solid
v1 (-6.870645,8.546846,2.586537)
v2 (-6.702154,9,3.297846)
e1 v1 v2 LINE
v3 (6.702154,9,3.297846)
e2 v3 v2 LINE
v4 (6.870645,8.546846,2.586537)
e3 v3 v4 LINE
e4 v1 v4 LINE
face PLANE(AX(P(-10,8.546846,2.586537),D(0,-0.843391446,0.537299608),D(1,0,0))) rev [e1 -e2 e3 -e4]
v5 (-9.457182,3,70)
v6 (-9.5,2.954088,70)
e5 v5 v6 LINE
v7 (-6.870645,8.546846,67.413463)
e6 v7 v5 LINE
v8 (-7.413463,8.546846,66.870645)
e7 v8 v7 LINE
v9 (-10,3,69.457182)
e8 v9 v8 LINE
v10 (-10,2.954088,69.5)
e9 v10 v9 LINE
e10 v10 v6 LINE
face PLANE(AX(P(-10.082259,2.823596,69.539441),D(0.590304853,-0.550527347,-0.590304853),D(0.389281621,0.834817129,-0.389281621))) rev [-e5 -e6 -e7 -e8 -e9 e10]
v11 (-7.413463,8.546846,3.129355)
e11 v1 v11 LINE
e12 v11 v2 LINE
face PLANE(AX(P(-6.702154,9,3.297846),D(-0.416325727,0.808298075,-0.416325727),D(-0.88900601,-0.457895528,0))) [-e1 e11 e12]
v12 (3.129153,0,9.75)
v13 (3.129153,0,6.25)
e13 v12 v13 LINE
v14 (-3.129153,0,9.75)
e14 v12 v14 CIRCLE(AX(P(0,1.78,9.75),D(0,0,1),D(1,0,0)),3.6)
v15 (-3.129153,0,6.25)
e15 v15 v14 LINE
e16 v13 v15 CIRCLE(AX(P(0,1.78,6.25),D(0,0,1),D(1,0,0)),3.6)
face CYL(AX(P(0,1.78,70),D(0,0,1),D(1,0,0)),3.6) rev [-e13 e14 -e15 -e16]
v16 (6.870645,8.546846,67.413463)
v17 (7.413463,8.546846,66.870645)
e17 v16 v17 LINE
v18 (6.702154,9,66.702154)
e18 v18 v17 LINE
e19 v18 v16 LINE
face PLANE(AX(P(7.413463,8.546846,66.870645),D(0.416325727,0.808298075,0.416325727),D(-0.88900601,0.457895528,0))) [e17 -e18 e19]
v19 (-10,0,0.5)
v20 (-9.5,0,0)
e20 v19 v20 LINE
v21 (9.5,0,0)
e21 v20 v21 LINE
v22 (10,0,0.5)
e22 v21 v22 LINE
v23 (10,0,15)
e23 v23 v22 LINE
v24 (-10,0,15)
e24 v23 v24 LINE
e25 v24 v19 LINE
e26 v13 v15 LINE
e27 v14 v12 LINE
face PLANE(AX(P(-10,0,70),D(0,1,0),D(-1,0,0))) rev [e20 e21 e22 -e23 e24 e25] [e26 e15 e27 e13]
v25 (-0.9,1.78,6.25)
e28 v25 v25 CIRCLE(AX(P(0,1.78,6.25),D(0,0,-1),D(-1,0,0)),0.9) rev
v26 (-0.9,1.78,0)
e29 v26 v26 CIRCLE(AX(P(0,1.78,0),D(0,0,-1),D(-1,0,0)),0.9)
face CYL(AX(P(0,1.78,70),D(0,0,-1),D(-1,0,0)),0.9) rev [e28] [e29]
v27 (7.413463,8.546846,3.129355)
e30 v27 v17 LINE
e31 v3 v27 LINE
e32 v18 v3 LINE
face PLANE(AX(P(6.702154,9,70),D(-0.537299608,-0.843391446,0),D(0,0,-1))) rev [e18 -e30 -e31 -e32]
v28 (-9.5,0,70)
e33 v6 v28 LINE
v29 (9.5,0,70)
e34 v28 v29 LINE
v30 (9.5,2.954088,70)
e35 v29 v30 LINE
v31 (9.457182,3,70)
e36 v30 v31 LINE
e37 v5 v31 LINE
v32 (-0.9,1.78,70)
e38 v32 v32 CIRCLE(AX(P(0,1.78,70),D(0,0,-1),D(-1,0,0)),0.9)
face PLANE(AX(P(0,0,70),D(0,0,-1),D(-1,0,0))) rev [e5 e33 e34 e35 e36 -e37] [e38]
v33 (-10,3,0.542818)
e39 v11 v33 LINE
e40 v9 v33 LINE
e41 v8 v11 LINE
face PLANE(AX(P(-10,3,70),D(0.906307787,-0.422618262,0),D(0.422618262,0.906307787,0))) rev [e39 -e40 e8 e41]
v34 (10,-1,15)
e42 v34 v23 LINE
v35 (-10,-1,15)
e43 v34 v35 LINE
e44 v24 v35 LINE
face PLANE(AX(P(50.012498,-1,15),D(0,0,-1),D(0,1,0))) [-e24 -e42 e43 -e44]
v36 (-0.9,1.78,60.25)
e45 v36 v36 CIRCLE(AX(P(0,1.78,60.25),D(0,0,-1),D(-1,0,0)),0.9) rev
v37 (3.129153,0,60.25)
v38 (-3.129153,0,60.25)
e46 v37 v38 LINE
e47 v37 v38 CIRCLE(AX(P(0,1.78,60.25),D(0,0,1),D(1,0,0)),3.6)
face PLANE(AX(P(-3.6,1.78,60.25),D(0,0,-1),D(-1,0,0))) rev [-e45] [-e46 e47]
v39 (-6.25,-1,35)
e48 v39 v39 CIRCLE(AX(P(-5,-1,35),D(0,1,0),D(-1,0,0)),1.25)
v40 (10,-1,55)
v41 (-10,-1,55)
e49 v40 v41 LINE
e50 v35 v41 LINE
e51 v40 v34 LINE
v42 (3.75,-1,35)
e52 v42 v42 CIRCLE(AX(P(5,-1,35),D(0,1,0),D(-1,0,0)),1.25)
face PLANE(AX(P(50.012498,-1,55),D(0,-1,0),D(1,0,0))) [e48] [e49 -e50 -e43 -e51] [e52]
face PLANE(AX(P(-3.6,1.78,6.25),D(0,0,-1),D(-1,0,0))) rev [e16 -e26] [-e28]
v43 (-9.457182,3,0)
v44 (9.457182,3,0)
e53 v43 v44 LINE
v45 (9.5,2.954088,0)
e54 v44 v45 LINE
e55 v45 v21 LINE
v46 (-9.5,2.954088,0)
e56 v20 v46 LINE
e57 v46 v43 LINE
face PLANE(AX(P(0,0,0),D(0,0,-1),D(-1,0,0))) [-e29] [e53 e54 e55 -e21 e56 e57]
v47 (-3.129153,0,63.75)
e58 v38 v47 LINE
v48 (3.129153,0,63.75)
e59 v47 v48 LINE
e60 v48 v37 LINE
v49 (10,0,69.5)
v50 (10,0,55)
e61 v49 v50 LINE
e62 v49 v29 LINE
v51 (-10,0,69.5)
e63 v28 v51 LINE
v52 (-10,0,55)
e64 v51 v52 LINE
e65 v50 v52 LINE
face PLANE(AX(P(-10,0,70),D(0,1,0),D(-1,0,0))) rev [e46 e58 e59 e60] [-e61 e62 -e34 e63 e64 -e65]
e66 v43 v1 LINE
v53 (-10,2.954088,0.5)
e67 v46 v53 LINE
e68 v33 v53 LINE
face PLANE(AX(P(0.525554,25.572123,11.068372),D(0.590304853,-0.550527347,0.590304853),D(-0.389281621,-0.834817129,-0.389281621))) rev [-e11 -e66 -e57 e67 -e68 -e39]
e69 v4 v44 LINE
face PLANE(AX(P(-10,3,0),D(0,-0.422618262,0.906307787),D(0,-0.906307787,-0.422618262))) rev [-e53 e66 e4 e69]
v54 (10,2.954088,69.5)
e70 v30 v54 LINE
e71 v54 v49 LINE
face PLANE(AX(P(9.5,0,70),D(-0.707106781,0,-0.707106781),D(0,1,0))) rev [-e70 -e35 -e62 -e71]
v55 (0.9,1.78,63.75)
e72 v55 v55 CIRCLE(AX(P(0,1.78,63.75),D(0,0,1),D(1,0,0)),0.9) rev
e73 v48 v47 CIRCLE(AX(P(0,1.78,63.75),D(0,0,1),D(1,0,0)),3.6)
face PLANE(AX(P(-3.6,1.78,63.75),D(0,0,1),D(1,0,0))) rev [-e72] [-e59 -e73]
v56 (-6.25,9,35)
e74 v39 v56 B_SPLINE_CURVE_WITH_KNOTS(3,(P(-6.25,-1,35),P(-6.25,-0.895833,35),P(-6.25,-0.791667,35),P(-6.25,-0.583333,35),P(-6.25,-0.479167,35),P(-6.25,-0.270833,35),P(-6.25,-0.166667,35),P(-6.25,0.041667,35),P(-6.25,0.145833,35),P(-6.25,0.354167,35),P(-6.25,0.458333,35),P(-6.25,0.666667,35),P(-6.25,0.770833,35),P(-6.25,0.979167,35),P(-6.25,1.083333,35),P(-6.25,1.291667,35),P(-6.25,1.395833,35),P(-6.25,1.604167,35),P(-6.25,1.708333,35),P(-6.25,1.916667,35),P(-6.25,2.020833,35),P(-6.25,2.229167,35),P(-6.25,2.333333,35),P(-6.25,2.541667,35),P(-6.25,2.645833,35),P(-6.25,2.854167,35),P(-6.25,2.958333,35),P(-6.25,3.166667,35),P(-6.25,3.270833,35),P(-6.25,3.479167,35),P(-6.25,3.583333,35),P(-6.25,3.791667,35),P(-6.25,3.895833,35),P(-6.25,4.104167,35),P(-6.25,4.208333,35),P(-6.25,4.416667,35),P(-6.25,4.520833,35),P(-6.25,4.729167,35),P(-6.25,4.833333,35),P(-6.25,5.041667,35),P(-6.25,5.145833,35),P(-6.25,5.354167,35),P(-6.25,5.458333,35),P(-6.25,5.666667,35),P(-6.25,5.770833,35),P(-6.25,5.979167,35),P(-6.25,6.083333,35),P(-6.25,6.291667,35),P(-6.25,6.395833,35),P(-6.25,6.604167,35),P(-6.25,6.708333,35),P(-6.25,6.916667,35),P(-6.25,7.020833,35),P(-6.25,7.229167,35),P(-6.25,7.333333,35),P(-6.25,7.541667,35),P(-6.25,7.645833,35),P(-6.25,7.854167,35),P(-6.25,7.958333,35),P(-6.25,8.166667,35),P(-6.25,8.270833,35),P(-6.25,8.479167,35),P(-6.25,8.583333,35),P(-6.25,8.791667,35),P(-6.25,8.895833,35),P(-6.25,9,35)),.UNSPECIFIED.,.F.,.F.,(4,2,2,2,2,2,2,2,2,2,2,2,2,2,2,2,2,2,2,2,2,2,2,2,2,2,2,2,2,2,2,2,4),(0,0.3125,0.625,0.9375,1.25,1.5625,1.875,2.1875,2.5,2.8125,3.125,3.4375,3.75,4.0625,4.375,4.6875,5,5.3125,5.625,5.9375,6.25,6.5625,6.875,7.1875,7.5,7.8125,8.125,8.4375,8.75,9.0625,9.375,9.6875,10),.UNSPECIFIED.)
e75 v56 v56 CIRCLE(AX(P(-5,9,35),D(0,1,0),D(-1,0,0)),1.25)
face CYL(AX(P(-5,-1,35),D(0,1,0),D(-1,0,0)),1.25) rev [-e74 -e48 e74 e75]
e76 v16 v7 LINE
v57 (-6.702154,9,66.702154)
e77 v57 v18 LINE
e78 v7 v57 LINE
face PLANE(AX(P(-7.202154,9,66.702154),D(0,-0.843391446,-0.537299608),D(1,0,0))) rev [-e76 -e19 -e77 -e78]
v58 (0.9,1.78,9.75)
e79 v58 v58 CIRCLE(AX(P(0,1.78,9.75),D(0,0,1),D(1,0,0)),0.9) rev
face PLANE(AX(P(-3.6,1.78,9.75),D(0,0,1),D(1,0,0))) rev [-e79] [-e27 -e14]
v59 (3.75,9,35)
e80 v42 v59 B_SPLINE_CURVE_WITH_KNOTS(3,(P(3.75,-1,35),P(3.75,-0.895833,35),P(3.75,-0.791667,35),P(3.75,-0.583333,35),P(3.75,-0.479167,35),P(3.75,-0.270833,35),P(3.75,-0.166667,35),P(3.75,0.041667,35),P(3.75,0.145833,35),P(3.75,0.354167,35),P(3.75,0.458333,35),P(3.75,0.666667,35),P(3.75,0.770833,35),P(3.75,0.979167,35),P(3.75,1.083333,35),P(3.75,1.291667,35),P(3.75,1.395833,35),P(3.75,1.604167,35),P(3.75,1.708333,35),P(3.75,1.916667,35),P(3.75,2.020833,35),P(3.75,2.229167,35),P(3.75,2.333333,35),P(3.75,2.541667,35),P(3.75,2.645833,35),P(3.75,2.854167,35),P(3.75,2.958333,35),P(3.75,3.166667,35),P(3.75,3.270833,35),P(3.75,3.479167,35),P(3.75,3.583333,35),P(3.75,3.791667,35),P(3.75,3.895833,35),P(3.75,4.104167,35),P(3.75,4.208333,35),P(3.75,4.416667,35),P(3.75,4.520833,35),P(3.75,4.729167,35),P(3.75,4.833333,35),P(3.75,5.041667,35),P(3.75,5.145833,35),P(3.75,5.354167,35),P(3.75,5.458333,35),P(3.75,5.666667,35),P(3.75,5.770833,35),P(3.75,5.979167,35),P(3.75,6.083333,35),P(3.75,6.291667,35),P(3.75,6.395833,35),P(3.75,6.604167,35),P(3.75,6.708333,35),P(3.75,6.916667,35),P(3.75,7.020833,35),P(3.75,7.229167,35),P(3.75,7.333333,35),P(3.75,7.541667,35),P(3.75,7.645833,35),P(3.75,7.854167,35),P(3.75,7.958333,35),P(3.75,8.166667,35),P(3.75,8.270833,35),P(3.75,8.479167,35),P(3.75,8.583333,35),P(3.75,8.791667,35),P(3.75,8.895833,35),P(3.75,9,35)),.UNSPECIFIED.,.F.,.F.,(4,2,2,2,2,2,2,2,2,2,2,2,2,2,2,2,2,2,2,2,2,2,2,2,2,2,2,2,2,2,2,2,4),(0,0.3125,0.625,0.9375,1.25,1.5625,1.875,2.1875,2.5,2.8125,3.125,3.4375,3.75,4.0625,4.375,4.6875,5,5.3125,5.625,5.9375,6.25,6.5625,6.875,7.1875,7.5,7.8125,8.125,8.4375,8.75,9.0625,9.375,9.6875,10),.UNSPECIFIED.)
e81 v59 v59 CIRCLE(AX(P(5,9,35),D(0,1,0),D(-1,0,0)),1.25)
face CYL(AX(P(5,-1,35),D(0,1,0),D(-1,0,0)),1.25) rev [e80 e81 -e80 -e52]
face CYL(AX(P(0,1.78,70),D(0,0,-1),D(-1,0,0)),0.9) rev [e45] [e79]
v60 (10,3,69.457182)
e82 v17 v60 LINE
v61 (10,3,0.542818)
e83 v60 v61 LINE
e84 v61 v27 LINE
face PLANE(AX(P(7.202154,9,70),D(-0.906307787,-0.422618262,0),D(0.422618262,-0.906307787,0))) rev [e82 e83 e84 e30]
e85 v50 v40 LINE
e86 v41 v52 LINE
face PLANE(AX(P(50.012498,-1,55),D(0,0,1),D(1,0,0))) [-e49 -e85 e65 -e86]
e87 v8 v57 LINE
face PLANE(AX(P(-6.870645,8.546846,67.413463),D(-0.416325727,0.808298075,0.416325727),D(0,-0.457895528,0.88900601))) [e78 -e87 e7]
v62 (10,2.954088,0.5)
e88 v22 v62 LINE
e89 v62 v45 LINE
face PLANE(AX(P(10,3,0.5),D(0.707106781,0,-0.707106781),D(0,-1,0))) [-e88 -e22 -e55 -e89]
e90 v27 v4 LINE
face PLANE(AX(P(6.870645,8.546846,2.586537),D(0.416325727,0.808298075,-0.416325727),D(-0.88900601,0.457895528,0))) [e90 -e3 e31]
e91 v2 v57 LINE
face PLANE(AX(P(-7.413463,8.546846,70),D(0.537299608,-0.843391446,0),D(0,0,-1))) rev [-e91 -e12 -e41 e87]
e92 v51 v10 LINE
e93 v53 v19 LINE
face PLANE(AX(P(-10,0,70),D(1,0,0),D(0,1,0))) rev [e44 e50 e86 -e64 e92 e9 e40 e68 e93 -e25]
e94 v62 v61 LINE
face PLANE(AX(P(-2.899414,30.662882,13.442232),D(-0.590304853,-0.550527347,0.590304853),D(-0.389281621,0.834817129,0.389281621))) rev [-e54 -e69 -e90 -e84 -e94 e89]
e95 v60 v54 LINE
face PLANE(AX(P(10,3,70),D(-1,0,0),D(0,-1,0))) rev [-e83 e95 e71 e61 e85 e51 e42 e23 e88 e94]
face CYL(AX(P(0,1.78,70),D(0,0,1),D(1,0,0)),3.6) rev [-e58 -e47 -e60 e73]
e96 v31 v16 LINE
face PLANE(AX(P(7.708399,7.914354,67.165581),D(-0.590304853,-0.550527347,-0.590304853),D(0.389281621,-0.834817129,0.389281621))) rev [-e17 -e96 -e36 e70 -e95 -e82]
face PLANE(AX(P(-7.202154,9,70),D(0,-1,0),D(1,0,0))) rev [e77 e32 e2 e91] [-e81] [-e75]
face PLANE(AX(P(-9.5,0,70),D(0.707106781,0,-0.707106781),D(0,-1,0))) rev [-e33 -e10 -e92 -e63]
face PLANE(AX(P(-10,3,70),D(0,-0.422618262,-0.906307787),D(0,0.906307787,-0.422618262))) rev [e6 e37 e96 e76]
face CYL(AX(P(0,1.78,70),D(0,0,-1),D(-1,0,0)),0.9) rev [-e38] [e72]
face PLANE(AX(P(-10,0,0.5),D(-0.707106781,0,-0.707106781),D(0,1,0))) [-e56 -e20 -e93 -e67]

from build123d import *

# Parameters (mm, degrees)
EXTRUDE_1_DEPTH     = 70
CUT_EXTRUDE_1_DEPTH = 74.35529974
SKETCH_3_W          = 18.609369779
SKETCH_3_H          = 2.954088086
EXTRUDE_3_DEPTH     = 15.5
SKETCH_4_W          = 40
SKETCH_4_H          = 1
EXTRUDE_4_DEPTH     = 20
SKETCH_5_R          = 0.9
CUT_EXTRUDE_2_DEPTH = 72.281133549
SKETCH_6_W          = 3.6
SKETCH_6_H          = 3.5
SKETCH_7_R          = 1.25
CUT_EXTRUDE_3_DEPTH = 72.414284285


with BuildPart() as part:
    # ｽｹｯﾁ1 → ﾎﾞｽ - 押し出し1 (new body)
    with BuildSketch(Plane.XY):
        Polygon((-10, 0), (10, 0), (10, 3), (7.202154051, 9), (-7.202154051, 9), (-10, 3), align=None)
    extrude(amount=EXTRUDE_1_DEPTH)

    # ｽｹｯﾁ2 → ｶｯﾄ - 押し出し1 (cut, through all)
    with BuildSketch(Plane(origin=(10, 0, 0), x_dir=(0, 0, -1), z_dir=(1, 0, 0))):
        Polygon((-70, 3), (-67.202154051, 9), (-70, 9), align=None)
        Polygon((-2.797845949, 9), (0, 9), (0, 3), align=None)
    extrude(amount=-CUT_EXTRUDE_1_DEPTH, mode=Mode.SUBTRACT)

    # 面取り1
    # the kernel refuses this chamfer: 0.5 mm, written as the material it takes off along each edge
    with BuildSketch(Plane(origin=(-6.995420754, 8.697897404, 3.004579246), x_dir=(-0.8270486586180938, -0.5268881046463177, -0.19590671622030348), z_dir=(-0.41632572739388457, 0.8082980746110386, -0.41632572739387685))) as chamfer_1_piece_1:
        Polygon((-0.459173014, 0.228990916), (0.400884159, 0.228990916), (0.058288855, -0.457981831), align=None)
    extrude(amount=0.4579583, mode=Mode.SUBTRACT)
    with BuildSketch(Plane(origin=(-6.995420754, 8.697897404, 66.995420754), x_dir=(0.1959067162203077, 0.5268881046463173, -0.8270486586180933), z_dir=(-0.41632572739387774, 0.8082980746110393, 0.4163257273938825))) as chamfer_1_piece_2:
        Polygon((-0.400884159, -0.228990916), (0.459173014, -0.228990916), (-0.058288855, 0.457981831), align=None)
    extrude(amount=0.4579583, mode=Mode.SUBTRACT)
    with BuildSketch(Plane(origin=(6.995420754, 8.697897404, 3.004579246), x_dir=(0.8270486586180947, -0.5268881046463163, -0.1959067162203037), z_dir=(0.4163257273938817, 0.8082980746110384, -0.41632572739387985))) as chamfer_1_piece_3:
        Polygon((-0.459173014, -0.228990916), (0.400884159, -0.228990916), (0.058288855, 0.457981831), align=None)
    extrude(amount=0.4579583, mode=Mode.SUBTRACT)
    with BuildSketch(Plane(origin=(6.995420754, 8.697897404, 66.995420754), x_dir=(-0.19590671622030845, 0.5268881046463186, -0.8270486586180921), z_dir=(0.4163257273938828, 0.8082980746110372, 0.4163257273938814))) as chamfer_1_piece_4:
        Polygon((-0.400884159, 0.228990916), (0.459173014, 0.228990916), (-0.058288855, -0.457981831), align=None)
    extrude(amount=0.4579583, mode=Mode.SUBTRACT)
    with BuildSketch(Plane(origin=(10, -1.285841494, 70), x_dir=(0.02749587661058574, 0, -0.9996219169112968), z_dir=(0, 1, 0)), Plane(origin=(-10, 4.285841494, 70), x_dir=(-0.02749587661058574, 0, -0.9996219169112968), z_dir=(0, -1, 0))) as chamfer_1_piece_5:
        with BuildLine():
            Line((0.514336598, 0), (-0.028273577, 0.513558897))
            Line((-0.028273577, 0.513558897), (-0.038269797, 0.513283938))
            ThreePointArc((-0.038269797, 0.513283938), (-0.017064614, 0.256698915), (-0.009996219, -0.000274959))
            Line((-0.009996219, -0.000274959), (0.000274959, -0.009996219))
            ThreePointArc((0.000274959, -0.009996219), (0.257248832, -0.002927825), (0.514611556, -0.009996219))
            Line((0.514611556, -0.009996219), (0.514336598, 0))
        make_face()
    extrude(amount=5.571682988, mode=Mode.SUBTRACT)
    with BuildSketch(Plane(origin=(-7.202154051, 9, 1.505397137), x_dir=(-0.4413655645980917, -0.8973273864019796, 0), z_dir=(0, 0, 1))) as chamfer_1_piece_6:
        with BuildLine():
            Line((0.516979525, 0), (-0.237770334, 0.459056747))
            Line((-0.237770334, 0.459056747), (-0.246743608, 0.454643091))
            ThreePointArc((-0.246743608, 0.454643091), (-0.123037104, 0.227486173), (-0.008973274, -0.004413656))
            Line((-0.008973274, -0.004413656), (0.000207861, -0.009997839))
            ThreePointArc((0.000207861, -0.009997839), (0.25858594, -0.004626004), (0.517187386, -0.009997839))
            Line((0.517187386, -0.009997839), (0.516979525, 0))
        make_face()
    extrude(amount=66.989205725, mode=Mode.SUBTRACT)
    with BuildSketch(Plane(origin=(7.202154051, 9, 1.505397137), x_dir=(0.441365564598093, -0.897327386401979, 0), z_dir=(0, 0, 1))) as chamfer_1_piece_7:
        with BuildLine():
            Line((0.516979525, 0), (-0.237770334, -0.459056747))
            Line((-0.237770334, -0.459056747), (-0.246743608, -0.454643091))
            ThreePointArc((-0.246743608, -0.454643091), (-0.123037104, -0.227486173), (-0.008973274, 0.004413656))
            Line((-0.008973274, 0.004413656), (0.000207861, 0.009997839))
            ThreePointArc((0.000207861, 0.009997839), (0.25858594, 0.004626004), (0.517187386, 0.009997839))
            Line((0.517187386, 0.009997839), (0.516979525, 0))
        make_face()
    extrude(amount=66.989205725, mode=Mode.SUBTRACT)
    with BuildSketch(Plane(origin=(8.494602863, 9, 67.202154051), x_dir=(0, -0.8973273864019776, 0.4413655645980958), z_dir=(-1, 0, 0))) as chamfer_1_piece_8:
        with BuildLine():
            Line((0.516979525, 0), (-0.237770334, -0.459056747))
            Line((-0.237770334, -0.459056747), (-0.246743608, -0.454643091))
            ThreePointArc((-0.246743608, -0.454643091), (-0.123037104, -0.227486173), (-0.008973274, 0.004413656))
            Line((-0.008973274, 0.004413656), (0.000207861, 0.009997839))
            ThreePointArc((0.000207861, 0.009997839), (0.25858594, 0.004626004), (0.517187386, 0.009997839))
            Line((0.517187386, 0.009997839), (0.516979525, 0))
        make_face()
    extrude(amount=16.989205725, mode=Mode.SUBTRACT)
    with BuildSketch(Plane(origin=(6.700455124, 10.075896822, 66.700455124), x_dir=(0.18700008699946485, -0.3421923931836809, -0.920834042327616), z_dir=(0.38928162063502725, -0.83481712947899, 0.38928162063501803)), Plane(origin=(-10.501698928, 1.924103178, 70.501698928), x_dir=(-0.1870000869994657, -0.34219239318368055, -0.920834042327616), z_dir=(0.38928162063502697, 0.8348171294789901, -0.3892816206350181))) as chamfer_1_piece_9:
        with BuildLine():
            Line((0.515512576, 0), (-0.117174183, -0.502019349))
            Line((-0.117174183, -0.502019349), (-0.126965941, -0.499989208))
            ThreePointArc((-0.126965941, -0.499989208), (-0.062103739, -0.250280562), (-0.009791758, 0.002030141))
            Line((-0.009791758, 0.002030141), (0.000248629, 0.009996909))
            ThreePointArc((0.000248629, 0.009996909), (0.257845581, 0.003590326), (0.515761205, 0.009996909))
            Line((0.515761205, 0.009996909), (0.515512576, 0))
        make_face()
    extrude(amount=9.764765667, mode=Mode.SUBTRACT)
    with BuildSketch(Plane(origin=(6.700455124, 10.075896822, 3.299544876), x_dir=(0.18700008699946544, -0.34219239318368183, 0.9208340423276157), z_dir=(0.38928162063502697, -0.8348171294789896, -0.38928162063501903)), Plane(origin=(-10.501698928, 1.924103178, -0.501698928), x_dir=(-0.18700008699946621, -0.3421923931836814, 0.9208340423276155), z_dir=(0.38928162063502675, 0.8348171294789897, 0.3892816206350191))) as chamfer_1_piece_10:
        with BuildLine():
            Line((0.515512576, 0), (-0.117174183, 0.502019349))
            Line((-0.117174183, 0.502019349), (-0.126965941, 0.499989208))
            ThreePointArc((-0.126965941, 0.499989208), (-0.062103739, 0.250280562), (-0.009791758, -0.002030141))
            Line((-0.009791758, -0.002030141), (0.000248629, -0.009996909))
            ThreePointArc((0.000248629, -0.009996909), (0.257845581, -0.003590326), (0.515761205, -0.009996909))
            Line((0.515761205, -0.009996909), (0.515512576, 0))
        make_face()
    extrude(amount=9.764765667, mode=Mode.SUBTRACT)
    with BuildSketch(Plane(origin=(8.494602863, 9, 2.797845949), x_dir=(0, -0.8973273864019827, -0.44136556459808546), z_dir=(-1, 0, 0))) as chamfer_1_piece_11:
        with BuildLine():
            Line((0.516979525, 0), (-0.237770334, 0.459056747))
            Line((-0.237770334, 0.459056747), (-0.246743608, 0.454643091))
            ThreePointArc((-0.246743608, 0.454643091), (-0.123037104, 0.227486173), (-0.008973274, -0.004413656))
            Line((-0.008973274, -0.004413656), (0.000207861, -0.009997839))
            ThreePointArc((0.000207861, -0.009997839), (0.25858594, -0.004626004), (0.517187386, -0.009997839))
            Line((0.517187386, -0.009997839), (0.516979525, 0))
        make_face()
    extrude(amount=16.989205725, mode=Mode.SUBTRACT)
    with BuildSketch(Plane(origin=(10, -1.285841494, 0), x_dir=(0.02749587661058563, 0, 0.9996219169112968), z_dir=(0, 1, 0)), Plane(origin=(-10, 4.285841494, 0), x_dir=(-0.02749587661058563, 0, 0.9996219169112968), z_dir=(0, -1, 0))) as chamfer_1_piece_12:
        with BuildLine():
            Line((0.514336598, 0), (-0.028273577, -0.513558897))
            Line((-0.028273577, -0.513558897), (-0.038269797, -0.513283938))
            ThreePointArc((-0.038269797, -0.513283938), (-0.017064614, -0.256698915), (-0.009996219, 0.000274959))
            Line((-0.009996219, 0.000274959), (0.000274959, 0.009996219))
            ThreePointArc((0.000274959, 0.009996219), (0.257248832, 0.002927825), (0.514611556, 0.009996219))
            Line((0.514611556, 0.009996219), (0.514336598, 0))
        make_face()
    extrude(amount=5.571682988, mode=Mode.SUBTRACT)

    # ｽｹｯﾁ3 → ﾎﾞｽ - 押し出し3 (add)
    with BuildSketch(Plane.XY.offset(70)):
        with Locations((-0.19531511, 1.477044043)):
            Rectangle(SKETCH_3_W, SKETCH_3_H)
    extrude(amount=-EXTRUDE_3_DEPTH)

    # ｽｹｯﾁ4 → ﾎﾞｽ - 押し出し4 (add)
    with BuildSketch(Plane.ZY.offset(10)):
        with Locations((35, -0.5)):
            Rectangle(SKETCH_4_W, SKETCH_4_H)
    extrude(amount=-EXTRUDE_4_DEPTH)

    # ｽｹｯﾁ5 → ｶｯﾄ - 押し出し2 (cut, through all)
    with BuildSketch(Plane(origin=(0, 0, 0), x_dir=(-1, 0, 0), z_dir=(0, 0, -1))):
        with Locations((0, 1.78)):
            Circle(SKETCH_5_R)
    extrude(amount=-CUT_EXTRUDE_2_DEPTH, mode=Mode.SUBTRACT)

    # ｽｹｯﾁ6 → ｶｯﾄ - 回転1 (revolve, cut)
    with BuildSketch(Plane(origin=(0, 1.78, 0), x_dir=(-1, 0, 0), z_dir=(0, -1, 0))):
        with Locations((1.8, -62)):
            Rectangle(SKETCH_6_W, SKETCH_6_H)
        with Locations((1.8, -8)):
            Rectangle(SKETCH_6_W, SKETCH_6_H)
    revolve(axis=Axis((0, 1.78, 70), (0, 0, -1)), mode=Mode.SUBTRACT)

    # ｽｹｯﾁ7 → ｶｯﾄ - 押し出し3 (cut, through all)
    with BuildSketch(Plane(origin=(0, 9, 0), x_dir=(1, 0, 0), z_dir=(0, 1, 0))):
        with Locations(Location((-5, -35, 0), (0, 0, 180))):
            Circle(SKETCH_7_R)
        with Locations(Location((5, -35, 0), (0, 0, 180))):
            Circle(SKETCH_7_R)
    extrude(amount=-CUT_EXTRUDE_3_DEPTH, mode=Mode.SUBTRACT)


solid = part.part
